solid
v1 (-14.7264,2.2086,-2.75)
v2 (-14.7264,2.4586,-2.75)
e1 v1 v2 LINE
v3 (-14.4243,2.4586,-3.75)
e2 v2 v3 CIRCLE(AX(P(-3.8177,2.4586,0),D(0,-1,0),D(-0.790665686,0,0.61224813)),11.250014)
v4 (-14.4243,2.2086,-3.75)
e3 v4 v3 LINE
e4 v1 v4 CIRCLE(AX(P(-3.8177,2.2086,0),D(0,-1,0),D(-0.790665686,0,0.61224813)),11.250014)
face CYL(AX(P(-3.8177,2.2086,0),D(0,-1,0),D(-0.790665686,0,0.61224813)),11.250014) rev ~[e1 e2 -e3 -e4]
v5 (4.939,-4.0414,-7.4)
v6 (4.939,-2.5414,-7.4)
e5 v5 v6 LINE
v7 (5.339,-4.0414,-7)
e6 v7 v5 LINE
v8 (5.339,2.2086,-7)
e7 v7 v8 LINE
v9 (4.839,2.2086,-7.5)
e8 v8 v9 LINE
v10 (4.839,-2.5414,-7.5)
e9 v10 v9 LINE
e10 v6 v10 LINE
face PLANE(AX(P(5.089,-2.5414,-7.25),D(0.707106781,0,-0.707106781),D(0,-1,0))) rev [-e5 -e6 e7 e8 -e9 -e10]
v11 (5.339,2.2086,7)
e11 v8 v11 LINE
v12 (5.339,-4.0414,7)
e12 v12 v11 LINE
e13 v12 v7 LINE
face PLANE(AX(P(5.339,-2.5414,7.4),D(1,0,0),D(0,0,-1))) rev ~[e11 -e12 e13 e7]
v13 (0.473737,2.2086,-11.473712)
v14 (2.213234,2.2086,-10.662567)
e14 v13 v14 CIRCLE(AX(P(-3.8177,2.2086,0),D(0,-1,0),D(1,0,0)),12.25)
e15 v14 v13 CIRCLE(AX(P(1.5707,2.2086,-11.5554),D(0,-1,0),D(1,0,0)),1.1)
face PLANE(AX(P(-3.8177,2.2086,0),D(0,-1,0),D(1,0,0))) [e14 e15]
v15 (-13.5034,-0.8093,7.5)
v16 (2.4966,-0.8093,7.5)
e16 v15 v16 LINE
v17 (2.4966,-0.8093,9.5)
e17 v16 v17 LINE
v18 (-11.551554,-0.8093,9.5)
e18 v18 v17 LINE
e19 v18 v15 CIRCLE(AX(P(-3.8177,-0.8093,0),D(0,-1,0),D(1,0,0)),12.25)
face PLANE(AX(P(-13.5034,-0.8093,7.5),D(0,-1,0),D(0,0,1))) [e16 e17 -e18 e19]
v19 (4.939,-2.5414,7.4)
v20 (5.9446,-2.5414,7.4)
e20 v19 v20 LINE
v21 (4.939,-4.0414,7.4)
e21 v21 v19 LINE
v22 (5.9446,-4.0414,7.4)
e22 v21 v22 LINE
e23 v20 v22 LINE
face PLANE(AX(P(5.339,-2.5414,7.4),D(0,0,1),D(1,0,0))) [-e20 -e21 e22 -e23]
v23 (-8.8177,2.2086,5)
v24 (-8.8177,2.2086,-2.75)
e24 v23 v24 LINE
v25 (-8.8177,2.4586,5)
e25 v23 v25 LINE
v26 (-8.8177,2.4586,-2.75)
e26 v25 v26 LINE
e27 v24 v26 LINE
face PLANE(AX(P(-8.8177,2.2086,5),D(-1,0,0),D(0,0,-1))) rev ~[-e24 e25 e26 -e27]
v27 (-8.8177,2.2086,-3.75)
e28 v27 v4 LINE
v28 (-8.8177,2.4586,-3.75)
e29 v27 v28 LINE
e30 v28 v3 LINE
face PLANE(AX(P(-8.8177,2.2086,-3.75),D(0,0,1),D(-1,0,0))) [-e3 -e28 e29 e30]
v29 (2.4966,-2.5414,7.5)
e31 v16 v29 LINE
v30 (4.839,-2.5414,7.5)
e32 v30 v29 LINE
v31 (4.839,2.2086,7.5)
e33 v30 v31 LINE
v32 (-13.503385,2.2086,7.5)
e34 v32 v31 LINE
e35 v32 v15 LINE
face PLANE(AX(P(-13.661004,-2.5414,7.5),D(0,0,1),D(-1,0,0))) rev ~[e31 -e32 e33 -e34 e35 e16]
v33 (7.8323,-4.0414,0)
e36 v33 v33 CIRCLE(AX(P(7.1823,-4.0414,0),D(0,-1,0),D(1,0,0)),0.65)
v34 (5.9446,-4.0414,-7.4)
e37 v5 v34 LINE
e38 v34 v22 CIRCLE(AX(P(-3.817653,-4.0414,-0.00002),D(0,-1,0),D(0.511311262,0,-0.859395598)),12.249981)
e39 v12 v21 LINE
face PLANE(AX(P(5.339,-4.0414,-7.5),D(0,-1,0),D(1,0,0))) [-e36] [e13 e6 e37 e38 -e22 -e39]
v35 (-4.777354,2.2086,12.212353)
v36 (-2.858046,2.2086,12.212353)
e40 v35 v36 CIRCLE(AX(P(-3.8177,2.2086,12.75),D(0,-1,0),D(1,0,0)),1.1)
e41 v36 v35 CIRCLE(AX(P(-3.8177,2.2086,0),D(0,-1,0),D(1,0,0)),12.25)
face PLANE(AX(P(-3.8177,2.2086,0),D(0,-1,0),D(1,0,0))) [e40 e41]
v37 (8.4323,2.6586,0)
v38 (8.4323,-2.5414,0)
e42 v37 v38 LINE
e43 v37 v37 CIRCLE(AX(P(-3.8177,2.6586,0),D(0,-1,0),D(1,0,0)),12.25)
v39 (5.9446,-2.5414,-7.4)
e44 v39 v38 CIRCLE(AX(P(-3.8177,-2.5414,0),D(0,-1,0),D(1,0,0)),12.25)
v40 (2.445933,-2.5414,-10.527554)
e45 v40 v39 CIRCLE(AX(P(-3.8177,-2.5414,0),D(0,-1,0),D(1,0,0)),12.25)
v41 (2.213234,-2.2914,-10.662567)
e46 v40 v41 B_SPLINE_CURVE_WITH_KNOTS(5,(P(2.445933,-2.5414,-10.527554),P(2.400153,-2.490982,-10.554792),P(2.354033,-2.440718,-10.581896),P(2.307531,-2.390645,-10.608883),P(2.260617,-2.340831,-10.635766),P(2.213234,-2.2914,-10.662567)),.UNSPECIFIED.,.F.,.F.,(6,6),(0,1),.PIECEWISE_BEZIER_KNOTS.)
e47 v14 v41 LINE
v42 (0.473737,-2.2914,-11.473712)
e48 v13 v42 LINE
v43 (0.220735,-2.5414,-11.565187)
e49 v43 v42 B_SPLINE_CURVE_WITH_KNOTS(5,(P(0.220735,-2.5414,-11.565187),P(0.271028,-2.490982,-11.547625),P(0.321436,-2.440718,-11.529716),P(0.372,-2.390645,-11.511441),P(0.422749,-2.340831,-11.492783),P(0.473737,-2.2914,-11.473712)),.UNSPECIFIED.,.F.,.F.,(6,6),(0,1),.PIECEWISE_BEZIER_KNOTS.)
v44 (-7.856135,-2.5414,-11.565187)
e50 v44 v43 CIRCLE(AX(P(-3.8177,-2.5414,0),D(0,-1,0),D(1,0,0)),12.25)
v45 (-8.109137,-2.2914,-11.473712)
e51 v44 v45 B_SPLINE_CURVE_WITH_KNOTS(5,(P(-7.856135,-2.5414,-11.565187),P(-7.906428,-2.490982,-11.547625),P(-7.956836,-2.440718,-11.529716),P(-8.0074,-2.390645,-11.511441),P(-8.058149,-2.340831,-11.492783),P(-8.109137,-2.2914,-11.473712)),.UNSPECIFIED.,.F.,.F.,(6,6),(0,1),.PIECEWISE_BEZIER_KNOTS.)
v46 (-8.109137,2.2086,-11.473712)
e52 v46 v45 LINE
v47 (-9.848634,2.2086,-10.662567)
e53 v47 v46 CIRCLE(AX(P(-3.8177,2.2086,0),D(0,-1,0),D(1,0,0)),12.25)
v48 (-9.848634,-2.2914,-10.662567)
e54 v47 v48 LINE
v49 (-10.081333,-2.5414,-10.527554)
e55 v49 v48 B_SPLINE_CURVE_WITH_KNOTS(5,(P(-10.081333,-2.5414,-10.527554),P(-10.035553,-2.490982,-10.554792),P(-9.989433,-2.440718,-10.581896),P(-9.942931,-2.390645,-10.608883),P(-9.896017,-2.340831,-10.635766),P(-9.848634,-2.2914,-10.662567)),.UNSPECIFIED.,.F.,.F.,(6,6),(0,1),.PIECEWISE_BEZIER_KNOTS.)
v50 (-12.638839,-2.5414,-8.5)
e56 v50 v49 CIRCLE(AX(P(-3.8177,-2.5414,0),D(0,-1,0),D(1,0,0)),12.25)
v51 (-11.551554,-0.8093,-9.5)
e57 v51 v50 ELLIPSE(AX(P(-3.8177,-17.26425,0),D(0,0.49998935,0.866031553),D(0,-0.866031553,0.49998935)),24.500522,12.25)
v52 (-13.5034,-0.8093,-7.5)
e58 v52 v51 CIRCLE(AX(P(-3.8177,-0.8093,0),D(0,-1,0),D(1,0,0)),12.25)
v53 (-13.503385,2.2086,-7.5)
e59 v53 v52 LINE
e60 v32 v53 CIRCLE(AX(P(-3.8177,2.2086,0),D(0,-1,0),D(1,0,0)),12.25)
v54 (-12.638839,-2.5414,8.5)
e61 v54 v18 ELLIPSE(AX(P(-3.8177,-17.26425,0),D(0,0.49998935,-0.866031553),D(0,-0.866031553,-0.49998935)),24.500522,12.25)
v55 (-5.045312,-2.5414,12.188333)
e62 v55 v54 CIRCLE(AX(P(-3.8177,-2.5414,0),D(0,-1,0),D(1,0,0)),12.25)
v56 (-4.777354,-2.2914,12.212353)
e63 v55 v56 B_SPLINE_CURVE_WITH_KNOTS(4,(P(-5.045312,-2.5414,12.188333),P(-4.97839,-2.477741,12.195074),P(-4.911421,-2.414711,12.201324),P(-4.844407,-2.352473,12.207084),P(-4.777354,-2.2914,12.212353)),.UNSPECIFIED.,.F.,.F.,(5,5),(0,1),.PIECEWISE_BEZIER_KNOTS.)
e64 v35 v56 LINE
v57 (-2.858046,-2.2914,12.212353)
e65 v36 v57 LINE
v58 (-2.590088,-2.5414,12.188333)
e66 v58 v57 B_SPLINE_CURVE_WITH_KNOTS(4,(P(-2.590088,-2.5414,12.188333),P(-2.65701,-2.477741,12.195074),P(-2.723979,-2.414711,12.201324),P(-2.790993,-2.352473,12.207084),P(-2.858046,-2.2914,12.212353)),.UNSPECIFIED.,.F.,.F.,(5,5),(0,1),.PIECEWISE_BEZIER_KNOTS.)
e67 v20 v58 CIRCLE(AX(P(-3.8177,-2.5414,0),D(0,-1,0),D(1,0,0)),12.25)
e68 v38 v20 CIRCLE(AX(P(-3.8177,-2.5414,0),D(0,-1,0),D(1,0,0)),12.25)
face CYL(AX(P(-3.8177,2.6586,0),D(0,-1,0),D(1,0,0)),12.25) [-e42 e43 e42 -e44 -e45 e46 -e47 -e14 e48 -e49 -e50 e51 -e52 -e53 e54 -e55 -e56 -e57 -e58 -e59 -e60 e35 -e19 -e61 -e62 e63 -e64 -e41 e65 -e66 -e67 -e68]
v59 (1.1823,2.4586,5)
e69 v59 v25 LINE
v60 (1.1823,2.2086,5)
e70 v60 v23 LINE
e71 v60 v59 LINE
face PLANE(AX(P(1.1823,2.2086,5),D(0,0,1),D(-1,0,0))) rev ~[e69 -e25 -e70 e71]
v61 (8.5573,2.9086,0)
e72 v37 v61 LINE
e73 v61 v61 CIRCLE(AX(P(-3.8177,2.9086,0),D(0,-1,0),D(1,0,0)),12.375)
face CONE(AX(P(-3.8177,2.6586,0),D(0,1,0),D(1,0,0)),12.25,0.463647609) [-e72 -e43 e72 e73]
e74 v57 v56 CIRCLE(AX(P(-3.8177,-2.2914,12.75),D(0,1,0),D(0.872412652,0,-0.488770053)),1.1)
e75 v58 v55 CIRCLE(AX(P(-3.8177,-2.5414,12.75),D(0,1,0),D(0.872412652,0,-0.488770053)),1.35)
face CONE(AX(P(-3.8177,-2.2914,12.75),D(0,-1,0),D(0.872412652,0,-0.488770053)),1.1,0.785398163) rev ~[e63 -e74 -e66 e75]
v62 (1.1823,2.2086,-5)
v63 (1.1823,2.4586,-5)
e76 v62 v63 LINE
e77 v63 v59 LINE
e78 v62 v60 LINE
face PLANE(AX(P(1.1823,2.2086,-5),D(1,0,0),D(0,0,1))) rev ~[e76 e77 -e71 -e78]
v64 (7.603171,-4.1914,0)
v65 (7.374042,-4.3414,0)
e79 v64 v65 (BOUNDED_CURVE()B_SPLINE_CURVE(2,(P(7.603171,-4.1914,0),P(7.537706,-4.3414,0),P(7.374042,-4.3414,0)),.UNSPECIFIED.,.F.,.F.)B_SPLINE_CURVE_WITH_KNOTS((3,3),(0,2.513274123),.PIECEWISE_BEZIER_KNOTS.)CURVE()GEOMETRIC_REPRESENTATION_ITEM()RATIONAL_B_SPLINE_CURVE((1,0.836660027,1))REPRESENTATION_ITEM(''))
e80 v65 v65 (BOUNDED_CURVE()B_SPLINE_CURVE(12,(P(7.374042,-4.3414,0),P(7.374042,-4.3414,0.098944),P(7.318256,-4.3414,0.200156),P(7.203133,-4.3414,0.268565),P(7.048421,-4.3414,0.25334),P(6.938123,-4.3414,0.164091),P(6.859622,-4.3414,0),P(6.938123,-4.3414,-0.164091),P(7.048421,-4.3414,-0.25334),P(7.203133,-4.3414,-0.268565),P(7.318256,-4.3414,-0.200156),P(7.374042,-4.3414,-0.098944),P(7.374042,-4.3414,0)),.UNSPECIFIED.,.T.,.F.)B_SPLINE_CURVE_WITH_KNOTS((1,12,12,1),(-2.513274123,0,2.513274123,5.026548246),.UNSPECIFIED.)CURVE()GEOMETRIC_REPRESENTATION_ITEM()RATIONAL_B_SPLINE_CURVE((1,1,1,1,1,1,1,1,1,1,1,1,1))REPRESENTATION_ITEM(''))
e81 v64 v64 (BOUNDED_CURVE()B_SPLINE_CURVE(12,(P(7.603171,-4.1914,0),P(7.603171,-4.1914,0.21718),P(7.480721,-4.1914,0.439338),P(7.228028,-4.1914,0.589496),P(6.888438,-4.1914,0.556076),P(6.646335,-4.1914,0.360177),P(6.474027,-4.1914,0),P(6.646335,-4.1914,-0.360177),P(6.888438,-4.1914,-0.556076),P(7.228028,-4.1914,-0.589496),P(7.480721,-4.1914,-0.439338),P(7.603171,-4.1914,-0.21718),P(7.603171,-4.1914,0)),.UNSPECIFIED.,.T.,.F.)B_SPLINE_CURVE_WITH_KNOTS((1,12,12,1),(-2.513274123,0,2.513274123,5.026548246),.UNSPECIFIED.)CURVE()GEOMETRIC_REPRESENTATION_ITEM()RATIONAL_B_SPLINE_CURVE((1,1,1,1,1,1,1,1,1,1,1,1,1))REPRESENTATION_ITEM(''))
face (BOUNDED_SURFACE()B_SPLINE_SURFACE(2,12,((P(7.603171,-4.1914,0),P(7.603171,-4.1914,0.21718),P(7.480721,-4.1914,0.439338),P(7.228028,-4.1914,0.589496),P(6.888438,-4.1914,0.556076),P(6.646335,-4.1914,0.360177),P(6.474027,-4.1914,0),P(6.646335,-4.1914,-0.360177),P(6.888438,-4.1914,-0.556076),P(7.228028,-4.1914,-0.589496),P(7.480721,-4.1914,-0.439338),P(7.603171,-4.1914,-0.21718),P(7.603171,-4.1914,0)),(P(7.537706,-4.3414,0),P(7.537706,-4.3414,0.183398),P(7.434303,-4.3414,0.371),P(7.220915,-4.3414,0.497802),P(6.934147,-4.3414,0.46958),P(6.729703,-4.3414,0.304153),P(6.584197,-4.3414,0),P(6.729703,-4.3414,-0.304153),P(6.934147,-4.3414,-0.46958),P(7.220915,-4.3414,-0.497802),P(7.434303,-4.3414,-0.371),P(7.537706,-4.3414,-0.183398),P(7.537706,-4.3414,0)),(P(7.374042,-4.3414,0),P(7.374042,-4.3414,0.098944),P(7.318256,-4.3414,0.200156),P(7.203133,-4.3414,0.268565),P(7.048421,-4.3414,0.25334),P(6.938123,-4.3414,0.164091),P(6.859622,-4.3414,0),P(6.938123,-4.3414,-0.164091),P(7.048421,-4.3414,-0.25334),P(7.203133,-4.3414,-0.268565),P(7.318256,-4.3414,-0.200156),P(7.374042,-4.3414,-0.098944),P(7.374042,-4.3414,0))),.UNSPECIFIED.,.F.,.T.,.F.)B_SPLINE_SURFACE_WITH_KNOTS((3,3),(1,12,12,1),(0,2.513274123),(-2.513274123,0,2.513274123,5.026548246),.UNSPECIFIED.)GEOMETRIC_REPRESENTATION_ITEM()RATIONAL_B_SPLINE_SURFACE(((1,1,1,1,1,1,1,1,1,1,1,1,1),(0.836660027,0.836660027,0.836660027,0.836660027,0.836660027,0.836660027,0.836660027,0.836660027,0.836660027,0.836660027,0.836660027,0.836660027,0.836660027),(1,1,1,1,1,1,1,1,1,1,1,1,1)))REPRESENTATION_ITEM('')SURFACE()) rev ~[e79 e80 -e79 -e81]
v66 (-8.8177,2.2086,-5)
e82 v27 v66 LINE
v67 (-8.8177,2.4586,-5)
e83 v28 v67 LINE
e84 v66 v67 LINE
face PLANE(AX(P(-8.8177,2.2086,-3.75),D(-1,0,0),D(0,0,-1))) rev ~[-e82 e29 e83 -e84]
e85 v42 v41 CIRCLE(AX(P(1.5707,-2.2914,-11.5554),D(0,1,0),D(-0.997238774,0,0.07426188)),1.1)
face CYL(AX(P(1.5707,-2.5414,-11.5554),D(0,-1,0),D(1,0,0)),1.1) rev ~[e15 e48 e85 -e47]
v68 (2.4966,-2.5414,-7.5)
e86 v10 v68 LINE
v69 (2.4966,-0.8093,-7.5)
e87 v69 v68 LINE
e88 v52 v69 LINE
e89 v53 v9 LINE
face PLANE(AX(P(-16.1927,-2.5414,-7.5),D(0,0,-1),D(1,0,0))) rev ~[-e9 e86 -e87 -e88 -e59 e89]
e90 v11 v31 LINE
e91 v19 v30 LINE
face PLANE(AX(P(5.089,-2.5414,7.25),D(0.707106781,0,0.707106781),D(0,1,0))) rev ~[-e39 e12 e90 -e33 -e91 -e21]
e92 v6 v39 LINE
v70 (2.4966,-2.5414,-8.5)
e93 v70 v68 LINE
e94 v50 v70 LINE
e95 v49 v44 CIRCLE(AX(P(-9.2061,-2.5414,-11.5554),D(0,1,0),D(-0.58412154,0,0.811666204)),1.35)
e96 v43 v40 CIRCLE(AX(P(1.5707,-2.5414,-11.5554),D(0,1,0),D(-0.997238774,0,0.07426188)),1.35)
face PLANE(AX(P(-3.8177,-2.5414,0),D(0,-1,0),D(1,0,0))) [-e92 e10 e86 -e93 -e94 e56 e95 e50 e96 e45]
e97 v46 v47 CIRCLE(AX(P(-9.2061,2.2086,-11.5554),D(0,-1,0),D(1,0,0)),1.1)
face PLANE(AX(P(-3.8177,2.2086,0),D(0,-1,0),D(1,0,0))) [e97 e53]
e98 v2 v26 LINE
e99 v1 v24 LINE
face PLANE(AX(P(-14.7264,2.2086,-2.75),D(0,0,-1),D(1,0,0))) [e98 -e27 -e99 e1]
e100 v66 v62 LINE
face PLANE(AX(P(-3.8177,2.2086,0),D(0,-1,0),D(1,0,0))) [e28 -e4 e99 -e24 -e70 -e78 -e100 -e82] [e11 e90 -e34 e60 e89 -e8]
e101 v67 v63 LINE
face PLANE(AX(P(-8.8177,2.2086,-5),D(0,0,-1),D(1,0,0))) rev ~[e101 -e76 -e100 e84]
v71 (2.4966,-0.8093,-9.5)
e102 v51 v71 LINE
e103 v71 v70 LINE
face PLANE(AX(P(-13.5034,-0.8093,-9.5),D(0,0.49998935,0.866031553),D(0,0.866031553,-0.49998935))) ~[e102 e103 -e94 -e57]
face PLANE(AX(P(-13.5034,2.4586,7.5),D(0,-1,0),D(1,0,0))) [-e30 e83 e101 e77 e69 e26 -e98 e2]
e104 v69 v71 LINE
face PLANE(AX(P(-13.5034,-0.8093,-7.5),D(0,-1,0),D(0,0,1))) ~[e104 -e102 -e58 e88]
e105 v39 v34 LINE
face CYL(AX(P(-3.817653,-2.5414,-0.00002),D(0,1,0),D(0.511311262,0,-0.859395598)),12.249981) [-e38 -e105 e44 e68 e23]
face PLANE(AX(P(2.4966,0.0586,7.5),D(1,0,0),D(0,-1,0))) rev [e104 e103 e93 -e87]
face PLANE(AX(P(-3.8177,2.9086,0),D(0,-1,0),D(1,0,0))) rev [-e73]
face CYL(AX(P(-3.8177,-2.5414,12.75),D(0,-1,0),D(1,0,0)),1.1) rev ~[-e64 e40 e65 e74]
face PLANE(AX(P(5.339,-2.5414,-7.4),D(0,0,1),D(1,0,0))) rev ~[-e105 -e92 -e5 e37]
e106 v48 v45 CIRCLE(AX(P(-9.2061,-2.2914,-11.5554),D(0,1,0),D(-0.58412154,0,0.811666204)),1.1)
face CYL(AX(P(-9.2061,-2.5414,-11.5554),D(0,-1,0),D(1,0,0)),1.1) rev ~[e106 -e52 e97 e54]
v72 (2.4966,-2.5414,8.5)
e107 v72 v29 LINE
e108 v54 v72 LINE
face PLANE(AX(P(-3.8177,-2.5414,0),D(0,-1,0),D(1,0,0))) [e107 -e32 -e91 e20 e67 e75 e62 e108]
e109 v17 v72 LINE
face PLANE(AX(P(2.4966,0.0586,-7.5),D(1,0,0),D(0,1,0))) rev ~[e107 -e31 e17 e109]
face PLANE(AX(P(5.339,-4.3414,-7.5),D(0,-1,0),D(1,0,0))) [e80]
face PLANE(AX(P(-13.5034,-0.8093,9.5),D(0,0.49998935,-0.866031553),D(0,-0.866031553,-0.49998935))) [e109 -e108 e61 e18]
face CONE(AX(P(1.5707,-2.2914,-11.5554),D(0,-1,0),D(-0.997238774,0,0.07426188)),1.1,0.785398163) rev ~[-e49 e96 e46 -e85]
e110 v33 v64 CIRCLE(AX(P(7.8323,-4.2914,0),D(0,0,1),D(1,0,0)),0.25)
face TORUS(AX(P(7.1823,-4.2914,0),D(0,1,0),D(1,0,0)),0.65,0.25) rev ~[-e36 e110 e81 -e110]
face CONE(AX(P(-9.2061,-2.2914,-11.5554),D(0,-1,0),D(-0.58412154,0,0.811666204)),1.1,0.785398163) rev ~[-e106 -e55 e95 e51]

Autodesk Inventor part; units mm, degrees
ref_plane "YZ Plane" through (0, 0, 0) normal (1, 0, 0) x (0, 1, 0)
ref_plane "XZ Plane" through (0, 0, 0) normal (0, 1, 0) x (-1, 0, 0)
ref_plane "XY Plane" through (0, 0, 0) normal (0, 0, 1) x (1, 0, 0)
sketch "Sketch1" plane through (0, 0, 0) normal (0, 0, 1) x (1, 0, 0)
  line L0 (-3.8177, -2.5414) -> (-3.8177, 2.9086)
  line L1 (-3.8177, 2.9086) -> (8.4464, 2.9086)
  line L2 (8.4323, 2.6586) -> (8.4323, -2.5414)
  line L3 (8.4323, -2.5414) -> (-3.8177, -2.5414)
  line L4 (-3.8177, 8.4062) -> (-3.8177, -10.1402)
  line L5 (8.4323, 2.6586) -> (8.5573, 2.9086)
  line L6 (8.5573, 2.9086) -> (8.4464, 2.9086)
  point P0 (0, 0)
  dimension "d1" = 24.5
  dimension "d2" = 5.45
  dimension "d29" = 0.25
  dimension "d30" = 24.75
revolve "Revolution1" add sketch "Sketch1" angle 360 about axis through (-3.8177, 8.4062, 0) along (0, -1, 0)
sketch "Sketch2" plane through (-3.8177, -2.5414, 0) normal (0, -1, 0) x (1, 0, 0)
  circle A0 centre (0, 0) radius 12.75 construction
  circle A1 centre (0, 0) radius 12.25 projected
  line L0 (0, 12.75) -> (0, -12.75) construction
  line L1 (-5.3884, -11.5554) -> (5.3884, 11.5554) construction
  line L2 (-5.3884, 11.5554) -> (5.3884, -11.5554) construction
  circle A2 centre (-5.3884, -11.5554) radius 1.1
  circle A3 centre (5.3884, -11.5554) radius 1.1
  circle A4 centre (0, 12.75) radius 1.1
  point P0 (3.8177, 0)
  dimension "d4" = 25.5
  dimension "d5" = 25
  dimension "d6" = 25
  dimension "d7" = 2.2
extrude "Extrusion1" cut sketch "Sketch2" against normal blind 4.75 contours A4 A1 | A1 A4 | A3 A1 | A1 A3 | A2 A1 | A1 A2
sketch "Sketch3" plane through (-3.8177, -2.5414, 0) normal (0, -1, 0) x (1, 0, 0)
  line L0 (-12.375, -7.5) -> (9.1567, -7.5)
  line L1 (9.1567, 7.5) -> (-12.375, 7.5)
  circle A0 centre (0, 0) radius 9.9629 construction
  line L2 (-12.375, 7.5) -> (-12.375, -7.5)
  line L3 (9.1567, -7.5) -> (9.1567, 7.5)
  circle A1 centre (0, 0) radius 12.375 projected
  point P0 (-9.8433, -7.5)
  dimension "d11" = 15
  dimension "d92" = 7.5
  dimension "d94" = 19
extrude "Extrusion2" cut sketch "Sketch3" against normal up to surface (4.75 mm away) contours L2 A1 L0 | A1 L1 L3 L0 | L2 L1 A1 picked at (1.9795, 0)
sketch "Sketch5" plane through (-13.5034, 2.2086, 7.5) normal (0, -1, 0) x (1, 0, 0)
  line L0 (14.6857, -2.5) -> (4.6857, -2.5)
  line L1 (4.6857, -2.5) -> (4.6857, -12.5)
  line L2 (4.6857, -12.5) -> (14.6857, -12.5)
  line L3 (14.6857, -12.5) -> (14.6857, -2.5)
  line L4 (14.6857, -2.5) -> (4.6857, -12.5) construction
  line L5 (4.6857, -2.5) -> (14.6857, -12.5) construction
  line L6 (-1.8929, -11.5) -> (-2.0018, -11.5)
  arc A0 (0, 0) -> (0, -15) centre (9.6857, -7.5) ccw projected
  arc A1 (0.7907, -0.6122) -> (0.7907, -14.3878) centre (9.6857, -7.5) ccw
  line L7 (4.6857, -11.25) -> (-0.9209, -11.25)
  line L8 (-1.223, -10.25) -> (4.6857, -10.25)
  point P0 (4.6857, -11.5)
  dimension "d95" = 10
  dimension "d99" = 1
  dimension "d100" = 1
  dimension "d101" = 1.25
extrude "Extrusion3" cut sketch "Sketch5" against normal blind 0.25
sketch "Sketch7" plane through (-3.8177, 2.9086, 0) normal (0, 1, 0) x (1, 0, 0)
  arc A0 (12.3346, 0.9992) -> (12.3346, -0.9992) centre (12.375, 0) ccw
  circle A1 centre (0, 0) radius 12.375 projected
  arc A2 (-12.3346, -0.9992) -> (-12.3346, 0.9992) centre (-12.375, 0) ccw
  line L0 (-12.375, 0) -> (12.375, 0) construction
  dimension "d34" = 2
extrude "Extrusion5" [suppressed]
ref_plane "Work Plane1" through (-13.5034, 0.0586, -7.5) normal (1, 0, 0) x (0, 1, 0)
ref_plane "Work Plane3" through (-16.0677, 0.0586, 0) normal (-1, 0, 0) x (0, -1, 0)
ref_plane "Work Plane2" through (5.339, -2.5414, 0) normal (0, 0, -1) x (-1, 0, 0)
sketch "Sketch10" plane through (-13.5034, 0.0586, -7.5) normal (1, 0, 0) x (0, 1, 0)
  line L0 (-0.8679, 15) -> (-0.8679, 17)
  line L1 (-0.8679, 17) -> (-2.6, 16)
  line L2 (2.15, 15) -> (-2.6, 15) projected
  line L3 (-2.6, 19.7124) -> (-2.6, 15) projected
  line L4 (-2.6, 0) -> (2.15, 0) projected
  line L5 (-2.6, 0) -> (-2.6, -3.1626) projected
  point P0 (-0.0586, 7.5)
  dimension "d69" = 60
  dimension "d70" = 1
  dimension "d71" = 2
extrude "Extrusion8" cut sketch "Sketch10" along normal blind 16
mirror "Mirror1" about plane through (5.339, -2.5414, 0) normal (0, 0, -1) of "Extrusion8"
chamfer "Chamfer2" distance 0.25 angle 45 3 edges at (-8.7412, -2.5414, -10.5585) (1.1058, -2.5414, -10.5585) (-3.8177, -2.5414, 11.65)
sketch "Sketch11" plane through (5.339, -2.5414, -7.5) normal (0, -1, 0) x (1, 0, 0)
  arc A0 (-10.3843, 19.6883) -> (-7.9291, 19.6883) centre (-9.1567, 20.25) ccw projected
  arc A1 (-10.3843, 19.6883) -> (-17.9778, 16) centre (-9.1567, 7.5) ccw projected
  line L0 (-17.9778, 16) -> (-2.8424, 16) projected
  line L1 (-2.8424, 16) -> (-2.8424, 15) projected
  line L2 (-2.8424, 15) -> (0, 15) projected
  line L3 (0, 15) -> (0, 0) projected
  line L4 (0, 0) -> (-2.8424, 0) projected
  line L5 (-2.8424, 0) -> (-2.8424, -1) projected
  line L6 (-2.8424, -1) -> (-17.9778, -1) projected
  arc A2 (-17.9778, -1) -> (-15.4203, -3.0276) centre (-9.1567, 7.5) ccw projected
  arc A3 (-13.1951, -4.0652) -> (-15.4203, -3.0276) centre (-14.5451, -4.0554) ccw projected
  arc A4 (-13.1951, -4.0652) -> (-5.1183, -4.0652) centre (-9.1567, 7.5) ccw projected
  arc A5 (-2.8931, -3.0276) -> (-5.1183, -4.0652) centre (-3.7683, -4.0554) ccw projected
  arc A6 (-2.8931, -3.0276) -> (-7.9291, 19.6883) centre (-9.1567, 7.5) ccw projected
  line L7 (0, 0.1) -> (0.6056, 0.1)
  line L8 (0, 14.9) -> (0.6056, 14.9)
  line L9 (-18.8424, 0) -> (-2.8424, 0) projected
  dimension "d82" = 0.1
  dimension "d83" = 0.1
extrude "Extrusion9" add sketch "Sketch11" along normal blind 1.5 contours A6 L7 L3 L8
chamfer "Chamfer3" distance 0.5 angle 45 2 edges at (5.339, -0.1664, 7.5) (5.339, -0.1664, -7.5)
sketch "Sketch12" plane through (5.339, -4.0414, -7.5) normal (0, -1, 0) x (1, 0, 0)
  circle A0 centre (1.8433, 7.5) radius 0.4
  circle A1 centre (-9.1567, 7.5) radius 12.25 construction
  arc A2 (-13.1951, -4.0652) -> (-5.1183, -4.0652) centre (-9.1567, 7.5) ccw projected
  dimension "d87" = 11
  dimension "d88" = 0.8
extrude "Extrusion10" add sketch "Sketch12" along normal blind 0.3
fillet "Fillet1" radius 0.25 2 edges at (6.7823, -4.0414, 0) (6.7823, -4.3414, 0)
equation "\"d92\" = 0.5 * d11"
properties part number "bottom1_2_bigtouch" material "Acrylic"
